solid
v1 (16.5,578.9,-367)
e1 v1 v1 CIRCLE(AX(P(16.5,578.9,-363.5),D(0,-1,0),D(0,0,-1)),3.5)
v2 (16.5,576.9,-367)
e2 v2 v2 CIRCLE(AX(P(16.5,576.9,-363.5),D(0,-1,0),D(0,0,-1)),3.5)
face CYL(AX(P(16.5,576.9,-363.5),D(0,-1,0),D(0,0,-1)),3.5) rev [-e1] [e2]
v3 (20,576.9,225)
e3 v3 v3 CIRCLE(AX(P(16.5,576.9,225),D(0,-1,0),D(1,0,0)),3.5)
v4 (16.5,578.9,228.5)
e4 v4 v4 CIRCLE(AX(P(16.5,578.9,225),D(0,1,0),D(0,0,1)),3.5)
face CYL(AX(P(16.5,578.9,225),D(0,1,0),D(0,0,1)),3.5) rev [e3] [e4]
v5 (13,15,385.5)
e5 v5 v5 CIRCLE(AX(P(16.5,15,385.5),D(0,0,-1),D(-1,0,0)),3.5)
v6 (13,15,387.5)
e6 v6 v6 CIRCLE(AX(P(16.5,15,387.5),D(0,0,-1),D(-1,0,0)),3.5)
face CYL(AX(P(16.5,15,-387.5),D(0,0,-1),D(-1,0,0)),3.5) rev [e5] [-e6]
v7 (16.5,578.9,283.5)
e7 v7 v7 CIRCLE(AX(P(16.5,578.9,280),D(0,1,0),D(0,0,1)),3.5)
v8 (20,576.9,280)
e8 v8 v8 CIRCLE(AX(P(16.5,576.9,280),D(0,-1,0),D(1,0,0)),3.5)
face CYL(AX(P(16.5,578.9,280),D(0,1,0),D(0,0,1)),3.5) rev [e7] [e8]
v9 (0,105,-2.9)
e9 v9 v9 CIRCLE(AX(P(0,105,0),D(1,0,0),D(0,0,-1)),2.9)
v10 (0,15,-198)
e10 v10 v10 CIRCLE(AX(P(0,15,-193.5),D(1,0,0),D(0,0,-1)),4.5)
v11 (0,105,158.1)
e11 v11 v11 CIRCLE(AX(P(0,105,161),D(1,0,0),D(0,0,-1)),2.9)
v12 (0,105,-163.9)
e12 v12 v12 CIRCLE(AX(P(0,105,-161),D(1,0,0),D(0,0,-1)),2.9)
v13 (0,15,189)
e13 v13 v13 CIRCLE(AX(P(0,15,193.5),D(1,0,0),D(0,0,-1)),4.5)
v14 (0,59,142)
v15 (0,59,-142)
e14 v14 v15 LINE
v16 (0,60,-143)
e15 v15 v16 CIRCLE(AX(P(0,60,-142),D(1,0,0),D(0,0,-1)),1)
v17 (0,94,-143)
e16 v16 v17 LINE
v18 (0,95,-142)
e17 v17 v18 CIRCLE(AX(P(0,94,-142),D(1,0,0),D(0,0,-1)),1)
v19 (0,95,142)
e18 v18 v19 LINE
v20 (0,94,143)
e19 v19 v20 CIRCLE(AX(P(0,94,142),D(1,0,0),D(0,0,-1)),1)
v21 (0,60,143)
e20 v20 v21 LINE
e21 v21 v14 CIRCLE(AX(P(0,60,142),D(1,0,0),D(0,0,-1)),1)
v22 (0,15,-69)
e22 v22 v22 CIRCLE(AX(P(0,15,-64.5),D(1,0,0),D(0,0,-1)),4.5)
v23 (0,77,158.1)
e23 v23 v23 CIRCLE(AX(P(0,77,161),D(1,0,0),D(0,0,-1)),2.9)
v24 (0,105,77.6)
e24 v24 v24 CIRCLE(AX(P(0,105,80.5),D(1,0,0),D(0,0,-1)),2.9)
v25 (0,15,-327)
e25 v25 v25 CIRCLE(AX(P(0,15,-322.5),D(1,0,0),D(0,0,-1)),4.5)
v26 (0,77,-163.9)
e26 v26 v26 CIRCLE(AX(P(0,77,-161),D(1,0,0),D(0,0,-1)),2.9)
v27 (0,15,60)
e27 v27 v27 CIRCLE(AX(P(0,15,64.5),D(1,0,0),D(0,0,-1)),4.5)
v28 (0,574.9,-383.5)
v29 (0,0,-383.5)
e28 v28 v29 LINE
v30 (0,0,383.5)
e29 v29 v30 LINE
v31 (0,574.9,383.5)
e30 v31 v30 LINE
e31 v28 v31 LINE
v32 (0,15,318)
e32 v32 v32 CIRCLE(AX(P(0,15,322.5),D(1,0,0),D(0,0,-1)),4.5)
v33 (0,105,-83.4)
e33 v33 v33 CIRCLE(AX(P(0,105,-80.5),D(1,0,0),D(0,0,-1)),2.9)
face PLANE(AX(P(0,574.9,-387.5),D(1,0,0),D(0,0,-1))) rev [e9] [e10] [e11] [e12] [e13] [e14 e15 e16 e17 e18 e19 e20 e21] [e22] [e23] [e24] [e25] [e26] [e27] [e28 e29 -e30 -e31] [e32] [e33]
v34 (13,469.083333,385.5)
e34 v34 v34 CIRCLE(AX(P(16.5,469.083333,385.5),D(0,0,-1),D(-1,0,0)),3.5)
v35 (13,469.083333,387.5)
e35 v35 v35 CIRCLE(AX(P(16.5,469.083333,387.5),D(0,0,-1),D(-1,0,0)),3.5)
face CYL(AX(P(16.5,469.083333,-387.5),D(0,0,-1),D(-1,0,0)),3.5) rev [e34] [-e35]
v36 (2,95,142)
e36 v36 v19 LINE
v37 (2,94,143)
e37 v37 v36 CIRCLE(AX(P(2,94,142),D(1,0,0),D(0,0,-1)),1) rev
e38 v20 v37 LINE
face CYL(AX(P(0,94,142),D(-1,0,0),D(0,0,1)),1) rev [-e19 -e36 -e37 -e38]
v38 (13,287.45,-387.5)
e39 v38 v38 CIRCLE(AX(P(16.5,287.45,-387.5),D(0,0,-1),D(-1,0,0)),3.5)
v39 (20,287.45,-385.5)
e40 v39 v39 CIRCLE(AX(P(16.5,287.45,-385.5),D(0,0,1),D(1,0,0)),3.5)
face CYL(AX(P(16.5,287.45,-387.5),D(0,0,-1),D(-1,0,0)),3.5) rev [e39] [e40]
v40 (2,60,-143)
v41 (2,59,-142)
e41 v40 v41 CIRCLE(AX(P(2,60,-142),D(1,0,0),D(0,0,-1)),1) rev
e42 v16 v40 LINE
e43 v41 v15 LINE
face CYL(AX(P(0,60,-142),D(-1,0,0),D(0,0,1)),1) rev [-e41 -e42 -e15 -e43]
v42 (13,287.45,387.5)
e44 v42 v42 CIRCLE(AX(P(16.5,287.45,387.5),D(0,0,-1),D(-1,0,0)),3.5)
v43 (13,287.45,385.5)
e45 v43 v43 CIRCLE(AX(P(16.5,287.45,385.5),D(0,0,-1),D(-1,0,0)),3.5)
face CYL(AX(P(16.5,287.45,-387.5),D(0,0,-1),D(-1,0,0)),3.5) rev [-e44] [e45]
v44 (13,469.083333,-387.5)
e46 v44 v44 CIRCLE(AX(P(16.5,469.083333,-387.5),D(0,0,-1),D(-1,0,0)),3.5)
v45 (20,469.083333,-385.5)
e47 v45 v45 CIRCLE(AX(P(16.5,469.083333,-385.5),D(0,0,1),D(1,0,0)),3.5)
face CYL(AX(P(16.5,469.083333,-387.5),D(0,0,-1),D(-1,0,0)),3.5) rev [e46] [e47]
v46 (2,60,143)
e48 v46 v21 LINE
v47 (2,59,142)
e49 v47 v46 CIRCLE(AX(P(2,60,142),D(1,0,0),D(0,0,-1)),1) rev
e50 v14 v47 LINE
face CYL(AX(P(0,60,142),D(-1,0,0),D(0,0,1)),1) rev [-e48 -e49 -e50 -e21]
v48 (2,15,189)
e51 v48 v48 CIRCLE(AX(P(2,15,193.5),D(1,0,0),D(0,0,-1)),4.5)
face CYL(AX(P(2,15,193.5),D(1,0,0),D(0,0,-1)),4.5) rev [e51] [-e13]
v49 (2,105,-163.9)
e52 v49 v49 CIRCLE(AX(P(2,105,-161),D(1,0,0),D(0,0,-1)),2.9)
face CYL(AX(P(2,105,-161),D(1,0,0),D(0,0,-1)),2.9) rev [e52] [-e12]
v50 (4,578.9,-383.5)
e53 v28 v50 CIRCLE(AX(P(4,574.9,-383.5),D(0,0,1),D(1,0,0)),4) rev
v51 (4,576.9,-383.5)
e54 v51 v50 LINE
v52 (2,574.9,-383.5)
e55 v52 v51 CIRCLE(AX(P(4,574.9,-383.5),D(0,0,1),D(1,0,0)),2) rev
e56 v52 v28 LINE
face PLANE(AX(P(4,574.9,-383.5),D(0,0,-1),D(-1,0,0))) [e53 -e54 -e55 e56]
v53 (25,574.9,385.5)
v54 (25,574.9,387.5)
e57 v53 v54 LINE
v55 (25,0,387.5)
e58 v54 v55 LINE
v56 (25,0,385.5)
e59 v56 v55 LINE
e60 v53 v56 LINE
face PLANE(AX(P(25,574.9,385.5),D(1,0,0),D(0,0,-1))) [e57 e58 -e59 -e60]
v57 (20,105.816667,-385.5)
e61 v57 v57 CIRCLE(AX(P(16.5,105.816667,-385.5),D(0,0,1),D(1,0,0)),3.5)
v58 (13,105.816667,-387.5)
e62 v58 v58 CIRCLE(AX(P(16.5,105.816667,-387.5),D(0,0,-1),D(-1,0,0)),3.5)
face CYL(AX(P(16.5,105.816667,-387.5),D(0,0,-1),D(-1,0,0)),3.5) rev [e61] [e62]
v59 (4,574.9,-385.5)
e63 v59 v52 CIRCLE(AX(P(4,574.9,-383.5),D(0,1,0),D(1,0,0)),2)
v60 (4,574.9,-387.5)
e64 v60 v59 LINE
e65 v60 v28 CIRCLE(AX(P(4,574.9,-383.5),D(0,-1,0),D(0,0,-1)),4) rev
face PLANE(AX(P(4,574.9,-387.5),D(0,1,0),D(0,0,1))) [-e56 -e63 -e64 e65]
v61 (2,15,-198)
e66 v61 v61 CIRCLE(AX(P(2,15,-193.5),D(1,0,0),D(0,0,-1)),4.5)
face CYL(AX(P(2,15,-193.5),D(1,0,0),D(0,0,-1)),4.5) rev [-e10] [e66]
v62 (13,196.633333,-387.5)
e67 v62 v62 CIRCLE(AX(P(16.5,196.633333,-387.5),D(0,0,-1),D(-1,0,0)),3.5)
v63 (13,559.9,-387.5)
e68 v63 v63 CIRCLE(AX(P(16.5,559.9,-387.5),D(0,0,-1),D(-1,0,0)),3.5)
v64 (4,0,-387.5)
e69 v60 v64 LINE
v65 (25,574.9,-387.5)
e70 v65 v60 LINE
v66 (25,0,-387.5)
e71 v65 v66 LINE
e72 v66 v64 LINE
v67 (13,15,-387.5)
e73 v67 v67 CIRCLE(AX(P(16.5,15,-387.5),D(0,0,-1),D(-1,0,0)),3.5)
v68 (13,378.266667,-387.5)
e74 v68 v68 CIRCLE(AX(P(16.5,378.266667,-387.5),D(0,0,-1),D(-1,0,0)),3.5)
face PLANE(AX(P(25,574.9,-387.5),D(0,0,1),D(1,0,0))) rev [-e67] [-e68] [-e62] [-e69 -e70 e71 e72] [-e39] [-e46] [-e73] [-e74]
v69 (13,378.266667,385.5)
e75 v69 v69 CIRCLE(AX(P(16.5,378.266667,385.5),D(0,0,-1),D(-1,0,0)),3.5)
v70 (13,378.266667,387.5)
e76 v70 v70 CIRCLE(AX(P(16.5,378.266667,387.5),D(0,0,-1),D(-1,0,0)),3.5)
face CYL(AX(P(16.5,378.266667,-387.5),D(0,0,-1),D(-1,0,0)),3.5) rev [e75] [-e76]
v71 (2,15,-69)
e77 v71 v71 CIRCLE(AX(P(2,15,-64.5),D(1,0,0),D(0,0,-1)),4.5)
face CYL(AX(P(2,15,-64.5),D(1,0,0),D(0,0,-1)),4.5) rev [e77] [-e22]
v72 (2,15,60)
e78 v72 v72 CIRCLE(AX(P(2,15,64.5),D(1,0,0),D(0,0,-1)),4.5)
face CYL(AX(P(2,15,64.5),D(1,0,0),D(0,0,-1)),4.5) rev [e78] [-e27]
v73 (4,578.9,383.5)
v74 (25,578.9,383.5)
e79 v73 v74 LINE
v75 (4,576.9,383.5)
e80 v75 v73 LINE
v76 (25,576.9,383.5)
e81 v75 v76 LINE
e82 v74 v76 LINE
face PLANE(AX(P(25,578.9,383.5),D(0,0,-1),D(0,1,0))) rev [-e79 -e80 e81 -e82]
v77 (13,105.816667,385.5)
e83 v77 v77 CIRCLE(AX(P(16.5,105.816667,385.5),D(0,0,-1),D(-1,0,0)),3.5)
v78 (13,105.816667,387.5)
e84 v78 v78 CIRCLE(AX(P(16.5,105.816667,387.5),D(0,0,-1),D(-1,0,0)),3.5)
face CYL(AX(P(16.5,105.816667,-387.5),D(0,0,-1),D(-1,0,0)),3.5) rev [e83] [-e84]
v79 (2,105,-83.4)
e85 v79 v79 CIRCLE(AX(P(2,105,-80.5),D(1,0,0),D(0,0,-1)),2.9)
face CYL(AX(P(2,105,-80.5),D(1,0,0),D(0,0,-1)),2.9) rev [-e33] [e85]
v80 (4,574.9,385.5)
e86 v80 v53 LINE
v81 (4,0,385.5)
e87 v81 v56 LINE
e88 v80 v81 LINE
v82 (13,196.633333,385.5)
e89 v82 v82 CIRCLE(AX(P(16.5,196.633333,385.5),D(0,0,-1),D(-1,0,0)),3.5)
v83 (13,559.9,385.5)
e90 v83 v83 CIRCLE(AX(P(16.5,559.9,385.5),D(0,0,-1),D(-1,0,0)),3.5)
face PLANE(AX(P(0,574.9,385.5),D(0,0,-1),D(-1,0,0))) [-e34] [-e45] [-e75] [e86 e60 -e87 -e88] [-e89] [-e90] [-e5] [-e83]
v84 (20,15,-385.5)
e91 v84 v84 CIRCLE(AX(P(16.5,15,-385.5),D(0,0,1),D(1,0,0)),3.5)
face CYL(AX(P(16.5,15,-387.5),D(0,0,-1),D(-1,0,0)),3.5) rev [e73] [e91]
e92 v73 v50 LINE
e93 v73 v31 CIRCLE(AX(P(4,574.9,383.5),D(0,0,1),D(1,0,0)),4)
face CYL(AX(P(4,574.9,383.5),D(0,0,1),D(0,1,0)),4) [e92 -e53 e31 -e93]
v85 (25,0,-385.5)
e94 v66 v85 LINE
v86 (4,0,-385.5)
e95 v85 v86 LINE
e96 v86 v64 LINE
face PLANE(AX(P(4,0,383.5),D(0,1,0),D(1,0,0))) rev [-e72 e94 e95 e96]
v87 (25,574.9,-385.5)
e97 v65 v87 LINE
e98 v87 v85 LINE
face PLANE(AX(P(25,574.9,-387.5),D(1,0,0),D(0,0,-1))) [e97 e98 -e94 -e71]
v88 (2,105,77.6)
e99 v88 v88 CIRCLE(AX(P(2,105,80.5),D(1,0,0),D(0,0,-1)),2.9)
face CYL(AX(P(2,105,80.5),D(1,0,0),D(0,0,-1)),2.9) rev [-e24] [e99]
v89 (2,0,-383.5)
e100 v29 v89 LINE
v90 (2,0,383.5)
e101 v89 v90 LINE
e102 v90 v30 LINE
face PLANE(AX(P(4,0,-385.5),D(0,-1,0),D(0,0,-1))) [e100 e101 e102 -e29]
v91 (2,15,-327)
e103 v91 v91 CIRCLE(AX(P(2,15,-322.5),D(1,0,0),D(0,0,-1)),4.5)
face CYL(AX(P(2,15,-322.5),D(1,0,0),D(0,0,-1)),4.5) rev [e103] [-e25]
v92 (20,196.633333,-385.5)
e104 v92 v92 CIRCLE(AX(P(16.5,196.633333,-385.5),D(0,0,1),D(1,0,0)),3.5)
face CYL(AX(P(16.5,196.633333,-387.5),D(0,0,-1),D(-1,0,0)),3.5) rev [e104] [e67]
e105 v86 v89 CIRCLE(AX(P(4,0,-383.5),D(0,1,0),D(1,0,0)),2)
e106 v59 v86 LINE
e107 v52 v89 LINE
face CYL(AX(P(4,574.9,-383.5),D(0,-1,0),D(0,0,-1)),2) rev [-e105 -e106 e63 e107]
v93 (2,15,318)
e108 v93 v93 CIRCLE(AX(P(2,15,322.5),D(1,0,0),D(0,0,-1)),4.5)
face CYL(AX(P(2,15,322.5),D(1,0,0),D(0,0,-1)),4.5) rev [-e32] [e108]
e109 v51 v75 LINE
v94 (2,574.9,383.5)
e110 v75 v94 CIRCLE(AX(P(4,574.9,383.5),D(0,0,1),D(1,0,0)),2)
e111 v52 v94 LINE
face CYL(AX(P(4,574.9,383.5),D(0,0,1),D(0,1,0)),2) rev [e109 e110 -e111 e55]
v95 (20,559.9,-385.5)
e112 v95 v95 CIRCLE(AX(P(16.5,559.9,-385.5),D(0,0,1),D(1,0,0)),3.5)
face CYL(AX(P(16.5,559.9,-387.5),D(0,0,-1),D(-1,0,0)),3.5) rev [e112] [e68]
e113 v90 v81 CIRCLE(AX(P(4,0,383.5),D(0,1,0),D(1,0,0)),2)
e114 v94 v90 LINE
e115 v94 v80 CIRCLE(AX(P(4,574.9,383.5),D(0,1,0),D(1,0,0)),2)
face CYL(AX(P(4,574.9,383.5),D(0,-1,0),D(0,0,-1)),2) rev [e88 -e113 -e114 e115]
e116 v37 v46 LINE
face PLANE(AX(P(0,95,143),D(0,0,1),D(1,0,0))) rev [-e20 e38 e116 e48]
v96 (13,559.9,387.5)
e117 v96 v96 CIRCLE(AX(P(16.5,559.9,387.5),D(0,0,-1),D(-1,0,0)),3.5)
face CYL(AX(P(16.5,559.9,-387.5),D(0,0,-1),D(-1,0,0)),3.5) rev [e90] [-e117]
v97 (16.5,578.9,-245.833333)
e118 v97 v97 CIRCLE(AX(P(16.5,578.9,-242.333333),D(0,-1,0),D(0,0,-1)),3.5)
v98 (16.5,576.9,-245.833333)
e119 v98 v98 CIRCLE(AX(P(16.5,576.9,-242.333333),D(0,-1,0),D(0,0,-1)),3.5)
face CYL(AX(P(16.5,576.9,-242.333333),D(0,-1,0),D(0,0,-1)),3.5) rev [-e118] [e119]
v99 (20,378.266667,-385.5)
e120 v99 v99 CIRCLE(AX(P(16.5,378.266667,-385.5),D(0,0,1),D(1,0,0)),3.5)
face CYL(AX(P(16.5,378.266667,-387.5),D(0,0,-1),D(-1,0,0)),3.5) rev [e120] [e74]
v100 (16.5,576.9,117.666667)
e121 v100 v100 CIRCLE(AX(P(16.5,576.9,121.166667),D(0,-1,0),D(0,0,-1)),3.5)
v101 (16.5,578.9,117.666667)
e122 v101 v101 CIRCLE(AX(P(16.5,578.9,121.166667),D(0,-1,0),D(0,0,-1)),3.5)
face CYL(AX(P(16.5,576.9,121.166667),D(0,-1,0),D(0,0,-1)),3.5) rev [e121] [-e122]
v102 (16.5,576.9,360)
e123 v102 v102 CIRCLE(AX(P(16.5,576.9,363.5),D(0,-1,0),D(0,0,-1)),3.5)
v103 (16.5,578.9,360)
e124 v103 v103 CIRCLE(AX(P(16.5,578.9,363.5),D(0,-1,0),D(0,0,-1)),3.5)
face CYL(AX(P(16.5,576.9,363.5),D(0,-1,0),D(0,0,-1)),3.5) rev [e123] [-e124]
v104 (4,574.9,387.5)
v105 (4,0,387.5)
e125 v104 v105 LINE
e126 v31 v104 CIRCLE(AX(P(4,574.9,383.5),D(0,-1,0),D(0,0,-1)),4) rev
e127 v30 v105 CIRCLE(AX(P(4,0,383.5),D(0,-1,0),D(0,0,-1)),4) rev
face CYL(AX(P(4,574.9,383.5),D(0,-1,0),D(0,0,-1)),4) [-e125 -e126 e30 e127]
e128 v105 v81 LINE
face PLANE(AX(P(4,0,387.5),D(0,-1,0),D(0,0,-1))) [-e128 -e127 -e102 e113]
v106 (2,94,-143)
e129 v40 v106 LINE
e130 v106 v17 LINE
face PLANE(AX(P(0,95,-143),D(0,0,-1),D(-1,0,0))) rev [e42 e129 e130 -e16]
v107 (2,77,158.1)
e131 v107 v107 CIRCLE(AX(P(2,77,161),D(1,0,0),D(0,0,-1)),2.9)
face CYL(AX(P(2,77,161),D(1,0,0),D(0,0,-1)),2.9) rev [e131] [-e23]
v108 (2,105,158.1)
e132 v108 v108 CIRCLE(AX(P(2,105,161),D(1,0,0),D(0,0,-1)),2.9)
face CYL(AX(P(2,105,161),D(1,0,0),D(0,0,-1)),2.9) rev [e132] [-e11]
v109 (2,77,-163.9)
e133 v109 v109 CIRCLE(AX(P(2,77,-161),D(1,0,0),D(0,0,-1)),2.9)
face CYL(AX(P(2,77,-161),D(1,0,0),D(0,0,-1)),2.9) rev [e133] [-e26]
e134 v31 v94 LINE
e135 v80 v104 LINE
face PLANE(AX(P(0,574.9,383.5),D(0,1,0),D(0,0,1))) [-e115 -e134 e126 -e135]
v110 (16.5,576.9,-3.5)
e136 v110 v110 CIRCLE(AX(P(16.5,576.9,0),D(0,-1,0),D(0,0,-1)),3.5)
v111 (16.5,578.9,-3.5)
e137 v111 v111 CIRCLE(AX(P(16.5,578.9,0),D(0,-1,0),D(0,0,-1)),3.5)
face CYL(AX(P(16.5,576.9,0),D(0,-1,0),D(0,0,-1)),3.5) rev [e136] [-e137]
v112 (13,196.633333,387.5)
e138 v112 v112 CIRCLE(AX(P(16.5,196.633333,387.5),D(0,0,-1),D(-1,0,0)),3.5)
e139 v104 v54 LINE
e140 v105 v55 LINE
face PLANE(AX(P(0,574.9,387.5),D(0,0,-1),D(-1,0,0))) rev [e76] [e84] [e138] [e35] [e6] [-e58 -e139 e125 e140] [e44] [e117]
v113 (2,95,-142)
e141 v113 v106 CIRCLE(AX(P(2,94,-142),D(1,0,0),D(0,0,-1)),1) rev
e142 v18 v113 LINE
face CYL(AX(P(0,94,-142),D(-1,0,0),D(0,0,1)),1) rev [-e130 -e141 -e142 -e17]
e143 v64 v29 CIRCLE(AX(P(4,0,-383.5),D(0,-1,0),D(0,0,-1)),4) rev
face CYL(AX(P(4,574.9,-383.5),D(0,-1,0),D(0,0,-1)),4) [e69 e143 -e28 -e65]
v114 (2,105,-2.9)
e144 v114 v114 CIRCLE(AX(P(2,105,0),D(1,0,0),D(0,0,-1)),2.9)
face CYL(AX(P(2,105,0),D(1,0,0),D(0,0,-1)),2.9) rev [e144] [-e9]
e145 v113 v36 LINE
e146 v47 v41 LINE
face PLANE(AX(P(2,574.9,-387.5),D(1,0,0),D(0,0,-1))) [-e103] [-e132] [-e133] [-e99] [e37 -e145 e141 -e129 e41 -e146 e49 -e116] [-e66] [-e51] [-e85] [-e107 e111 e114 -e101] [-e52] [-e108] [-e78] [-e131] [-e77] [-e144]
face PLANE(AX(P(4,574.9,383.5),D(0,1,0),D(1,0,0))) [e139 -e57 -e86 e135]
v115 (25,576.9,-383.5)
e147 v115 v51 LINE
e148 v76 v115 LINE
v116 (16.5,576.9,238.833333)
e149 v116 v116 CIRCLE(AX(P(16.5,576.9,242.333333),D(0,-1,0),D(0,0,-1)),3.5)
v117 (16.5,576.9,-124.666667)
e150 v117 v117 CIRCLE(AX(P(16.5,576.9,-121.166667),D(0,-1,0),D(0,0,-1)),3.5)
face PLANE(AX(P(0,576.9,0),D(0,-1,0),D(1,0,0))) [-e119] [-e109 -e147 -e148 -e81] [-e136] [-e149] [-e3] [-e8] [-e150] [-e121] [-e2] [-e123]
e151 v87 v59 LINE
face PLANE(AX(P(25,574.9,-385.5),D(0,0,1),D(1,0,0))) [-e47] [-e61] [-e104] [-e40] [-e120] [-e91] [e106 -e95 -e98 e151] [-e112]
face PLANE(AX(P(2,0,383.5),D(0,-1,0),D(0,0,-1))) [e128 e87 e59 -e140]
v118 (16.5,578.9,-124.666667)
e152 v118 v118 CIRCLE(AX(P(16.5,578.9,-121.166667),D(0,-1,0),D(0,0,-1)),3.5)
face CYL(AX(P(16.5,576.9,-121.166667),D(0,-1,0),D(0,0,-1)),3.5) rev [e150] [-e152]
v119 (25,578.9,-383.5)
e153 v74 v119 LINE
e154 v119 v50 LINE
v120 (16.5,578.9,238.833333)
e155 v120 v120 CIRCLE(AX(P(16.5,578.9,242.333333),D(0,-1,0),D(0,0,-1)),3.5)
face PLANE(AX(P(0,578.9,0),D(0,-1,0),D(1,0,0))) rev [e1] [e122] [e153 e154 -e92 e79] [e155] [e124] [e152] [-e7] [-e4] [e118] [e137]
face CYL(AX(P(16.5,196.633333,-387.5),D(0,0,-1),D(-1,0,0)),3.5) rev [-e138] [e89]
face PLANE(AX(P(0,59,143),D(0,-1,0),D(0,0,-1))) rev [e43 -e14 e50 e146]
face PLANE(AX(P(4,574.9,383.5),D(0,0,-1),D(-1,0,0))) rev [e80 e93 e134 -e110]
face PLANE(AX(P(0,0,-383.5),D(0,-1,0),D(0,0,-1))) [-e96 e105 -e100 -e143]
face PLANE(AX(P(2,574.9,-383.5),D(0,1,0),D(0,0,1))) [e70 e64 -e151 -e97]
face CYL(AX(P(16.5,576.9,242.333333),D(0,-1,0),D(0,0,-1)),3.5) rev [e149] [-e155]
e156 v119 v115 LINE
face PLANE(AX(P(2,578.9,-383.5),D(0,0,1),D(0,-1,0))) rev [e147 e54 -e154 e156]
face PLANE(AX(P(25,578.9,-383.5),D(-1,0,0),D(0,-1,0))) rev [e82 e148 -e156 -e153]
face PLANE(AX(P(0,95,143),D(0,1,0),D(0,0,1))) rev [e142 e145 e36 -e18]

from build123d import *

# Parameters (mm, degrees)
BASE_FLANGE1_DEPTH       = 574.9
EDGE_FLANGE1_DEPTH       = 767
M8_CLEARANCE_HOLE1_D     = 9
LPATTERN1_COUNT          = 6
LPATTERN1_PITCH          = 129
F_7_0_7_DIAMETER_HOLE1_D = 7
F_7_0_7_DIAMETER_HOLE2_D = 7
F_7_0_7_DIAMETER_HOLE3_D = 7
SKETCH17_W               = 286
SKETCH17_H               = 36
CUT_EXTRUDE1_DEPTH       = 2
M5_CLEARANCE_HOLE1_D     = 5.8
FILLET1_R                = 1


# Sheet-metal steps are written as plain solids
with BuildPart() as part:
    # Sketch1 → Base-Flange1 (new body)
    with BuildSketch(Plane(origin=(0, 0, 0), x_dir=(1, 0, 0), z_dir=(0, 1, 0))):
        with BuildLine():
            Line((25, 387.5), (4, 387.5))
            ThreePointArc((4, 387.5), (1.171572875, 386.328427125), (0, 383.5))
            Line((0, 383.5), (0, -383.5))
            ThreePointArc((0, -383.5), (1.171572875, -386.328427125), (4, -387.5))
            Line((4, -387.5), (25, -387.5))
            Line((25, -387.5), (25, -385.5))
            Line((25, -385.5), (4, -385.5))
            ThreePointArc((4, -385.5), (2.585786438, -384.914213562), (2, -383.5))
            Line((2, -383.5), (2, 383.5))
            ThreePointArc((2, 383.5), (2.585786438, 384.914213562), (4, 385.5))
            Line((4, 385.5), (25, 385.5))
            Line((25, 385.5), (25, 387.5))
        make_face()
    extrude(amount=BASE_FLANGE1_DEPTH)

    # Edge-Flange1 section (across the edge) → Edge-Flange1 (add)
    with BuildSketch(Plane(origin=(2, 576.9, -383.5), x_dir=(0, -1, 0), z_dir=(0, 0, 1))):
        with BuildLine():
            Line((-2, 2), (-2, 23))
            Line((-2, 23), (0, 23))
            Line((0, 23), (0, 2))
            ThreePointArc((0, 2), (0.585786438, 0.585786438), (2, 0))
            Line((2, 0), (2, -2))
            ThreePointArc((2, -2), (-0.828427125, -0.828427125), (-2, 2))
        make_face()
    extrude(amount=EDGE_FLANGE1_DEPTH)

    # M8 Clearance Hole1 (through all)
    with Locations(Plane(origin=(2, 0, 0), x_dir=(0, 0, -1), z_dir=(1, 0, 0))):
        with Locations((322.5, 15)):
            m8_clearance_hole1 = Hole(M8_CLEARANCE_HOLE1_D / 2)

    # LPattern1: M8 Clearance Hole1 ×6
    with Locations(*[(0, 0, i * LPATTERN1_PITCH) for i in range(1, LPATTERN1_COUNT)]):
        add(m8_clearance_hole1, mode=Mode.SUBTRACT)

    # Ø7.0 (7) Diameter Hole1 (through all)
    with Locations(Plane(origin=(0, 0, -387.5), x_dir=(-1, 0, 0), z_dir=(0, 0, -1))):
        with Locations((-16.5, 559.9), (-16.5, 469.083333333), (-16.5, 378.266666667), (-16.5, 287.45), (-16.5, 196.633333333), (-16.5, 105.816666667), (-16.5, 15)):
            Hole(F_7_0_7_DIAMETER_HOLE1_D / 2)

    # Ø7.0 (7) Diameter Hole2 (through all)
    with Locations(Plane(origin=(0, 576.9, 0), x_dir=(-1, 0, 0), z_dir=(0, -1, 0))):
        with Locations((-16.5, 363.5), (-16.5, 242.333333333), (-16.5, 121.166666667), (-16.5, 0), (-16.5, -121.166666667), (-16.5, -242.333333333), (-16.5, -363.5)):
            Hole(F_7_0_7_DIAMETER_HOLE2_D / 2)

    # Ø7.0 (7) Diameter Hole3 (through all)
    with Locations(Plane(origin=(0, 578.9, 0), x_dir=(1, 0, 0), z_dir=(0, 1, 0))):
        with Locations((16.5, -225), (16.5, -280)):
            Hole(F_7_0_7_DIAMETER_HOLE3_D / 2)

    # Sketch17 → Cut-Extrude1 (cut)
    with BuildSketch(Plane(origin=(2, 0, 0), x_dir=(0, 0, -1), z_dir=(1, 0, 0))):
        with Locations((0, 77)):
            Rectangle(SKETCH17_W, SKETCH17_H)
    extrude(amount=-CUT_EXTRUDE1_DEPTH, mode=Mode.SUBTRACT)

    # M5 Clearance Hole1 (through all)
    with Locations(Plane(origin=(2, 0, 0), x_dir=(0, 0, -1), z_dir=(1, 0, 0))):
        with Locations((-161, 77), (-161, 105), (-80.5, 105), (0, 105), (80.5, 105), (161, 105), (161, 77)):
            Hole(M5_CLEARANCE_HOLE1_D / 2)

    # Fillet1
    fillet1_edges = [part.edges().sort_by_distance(p)[0] for p in [
        (1, 59, 143),
        (1, 95, 143),
        (1, 95, -143),
        (1, 59, -143),
    ]]
    fillet(fillet1_edges, radius=FILLET1_R)


solid = part.part
